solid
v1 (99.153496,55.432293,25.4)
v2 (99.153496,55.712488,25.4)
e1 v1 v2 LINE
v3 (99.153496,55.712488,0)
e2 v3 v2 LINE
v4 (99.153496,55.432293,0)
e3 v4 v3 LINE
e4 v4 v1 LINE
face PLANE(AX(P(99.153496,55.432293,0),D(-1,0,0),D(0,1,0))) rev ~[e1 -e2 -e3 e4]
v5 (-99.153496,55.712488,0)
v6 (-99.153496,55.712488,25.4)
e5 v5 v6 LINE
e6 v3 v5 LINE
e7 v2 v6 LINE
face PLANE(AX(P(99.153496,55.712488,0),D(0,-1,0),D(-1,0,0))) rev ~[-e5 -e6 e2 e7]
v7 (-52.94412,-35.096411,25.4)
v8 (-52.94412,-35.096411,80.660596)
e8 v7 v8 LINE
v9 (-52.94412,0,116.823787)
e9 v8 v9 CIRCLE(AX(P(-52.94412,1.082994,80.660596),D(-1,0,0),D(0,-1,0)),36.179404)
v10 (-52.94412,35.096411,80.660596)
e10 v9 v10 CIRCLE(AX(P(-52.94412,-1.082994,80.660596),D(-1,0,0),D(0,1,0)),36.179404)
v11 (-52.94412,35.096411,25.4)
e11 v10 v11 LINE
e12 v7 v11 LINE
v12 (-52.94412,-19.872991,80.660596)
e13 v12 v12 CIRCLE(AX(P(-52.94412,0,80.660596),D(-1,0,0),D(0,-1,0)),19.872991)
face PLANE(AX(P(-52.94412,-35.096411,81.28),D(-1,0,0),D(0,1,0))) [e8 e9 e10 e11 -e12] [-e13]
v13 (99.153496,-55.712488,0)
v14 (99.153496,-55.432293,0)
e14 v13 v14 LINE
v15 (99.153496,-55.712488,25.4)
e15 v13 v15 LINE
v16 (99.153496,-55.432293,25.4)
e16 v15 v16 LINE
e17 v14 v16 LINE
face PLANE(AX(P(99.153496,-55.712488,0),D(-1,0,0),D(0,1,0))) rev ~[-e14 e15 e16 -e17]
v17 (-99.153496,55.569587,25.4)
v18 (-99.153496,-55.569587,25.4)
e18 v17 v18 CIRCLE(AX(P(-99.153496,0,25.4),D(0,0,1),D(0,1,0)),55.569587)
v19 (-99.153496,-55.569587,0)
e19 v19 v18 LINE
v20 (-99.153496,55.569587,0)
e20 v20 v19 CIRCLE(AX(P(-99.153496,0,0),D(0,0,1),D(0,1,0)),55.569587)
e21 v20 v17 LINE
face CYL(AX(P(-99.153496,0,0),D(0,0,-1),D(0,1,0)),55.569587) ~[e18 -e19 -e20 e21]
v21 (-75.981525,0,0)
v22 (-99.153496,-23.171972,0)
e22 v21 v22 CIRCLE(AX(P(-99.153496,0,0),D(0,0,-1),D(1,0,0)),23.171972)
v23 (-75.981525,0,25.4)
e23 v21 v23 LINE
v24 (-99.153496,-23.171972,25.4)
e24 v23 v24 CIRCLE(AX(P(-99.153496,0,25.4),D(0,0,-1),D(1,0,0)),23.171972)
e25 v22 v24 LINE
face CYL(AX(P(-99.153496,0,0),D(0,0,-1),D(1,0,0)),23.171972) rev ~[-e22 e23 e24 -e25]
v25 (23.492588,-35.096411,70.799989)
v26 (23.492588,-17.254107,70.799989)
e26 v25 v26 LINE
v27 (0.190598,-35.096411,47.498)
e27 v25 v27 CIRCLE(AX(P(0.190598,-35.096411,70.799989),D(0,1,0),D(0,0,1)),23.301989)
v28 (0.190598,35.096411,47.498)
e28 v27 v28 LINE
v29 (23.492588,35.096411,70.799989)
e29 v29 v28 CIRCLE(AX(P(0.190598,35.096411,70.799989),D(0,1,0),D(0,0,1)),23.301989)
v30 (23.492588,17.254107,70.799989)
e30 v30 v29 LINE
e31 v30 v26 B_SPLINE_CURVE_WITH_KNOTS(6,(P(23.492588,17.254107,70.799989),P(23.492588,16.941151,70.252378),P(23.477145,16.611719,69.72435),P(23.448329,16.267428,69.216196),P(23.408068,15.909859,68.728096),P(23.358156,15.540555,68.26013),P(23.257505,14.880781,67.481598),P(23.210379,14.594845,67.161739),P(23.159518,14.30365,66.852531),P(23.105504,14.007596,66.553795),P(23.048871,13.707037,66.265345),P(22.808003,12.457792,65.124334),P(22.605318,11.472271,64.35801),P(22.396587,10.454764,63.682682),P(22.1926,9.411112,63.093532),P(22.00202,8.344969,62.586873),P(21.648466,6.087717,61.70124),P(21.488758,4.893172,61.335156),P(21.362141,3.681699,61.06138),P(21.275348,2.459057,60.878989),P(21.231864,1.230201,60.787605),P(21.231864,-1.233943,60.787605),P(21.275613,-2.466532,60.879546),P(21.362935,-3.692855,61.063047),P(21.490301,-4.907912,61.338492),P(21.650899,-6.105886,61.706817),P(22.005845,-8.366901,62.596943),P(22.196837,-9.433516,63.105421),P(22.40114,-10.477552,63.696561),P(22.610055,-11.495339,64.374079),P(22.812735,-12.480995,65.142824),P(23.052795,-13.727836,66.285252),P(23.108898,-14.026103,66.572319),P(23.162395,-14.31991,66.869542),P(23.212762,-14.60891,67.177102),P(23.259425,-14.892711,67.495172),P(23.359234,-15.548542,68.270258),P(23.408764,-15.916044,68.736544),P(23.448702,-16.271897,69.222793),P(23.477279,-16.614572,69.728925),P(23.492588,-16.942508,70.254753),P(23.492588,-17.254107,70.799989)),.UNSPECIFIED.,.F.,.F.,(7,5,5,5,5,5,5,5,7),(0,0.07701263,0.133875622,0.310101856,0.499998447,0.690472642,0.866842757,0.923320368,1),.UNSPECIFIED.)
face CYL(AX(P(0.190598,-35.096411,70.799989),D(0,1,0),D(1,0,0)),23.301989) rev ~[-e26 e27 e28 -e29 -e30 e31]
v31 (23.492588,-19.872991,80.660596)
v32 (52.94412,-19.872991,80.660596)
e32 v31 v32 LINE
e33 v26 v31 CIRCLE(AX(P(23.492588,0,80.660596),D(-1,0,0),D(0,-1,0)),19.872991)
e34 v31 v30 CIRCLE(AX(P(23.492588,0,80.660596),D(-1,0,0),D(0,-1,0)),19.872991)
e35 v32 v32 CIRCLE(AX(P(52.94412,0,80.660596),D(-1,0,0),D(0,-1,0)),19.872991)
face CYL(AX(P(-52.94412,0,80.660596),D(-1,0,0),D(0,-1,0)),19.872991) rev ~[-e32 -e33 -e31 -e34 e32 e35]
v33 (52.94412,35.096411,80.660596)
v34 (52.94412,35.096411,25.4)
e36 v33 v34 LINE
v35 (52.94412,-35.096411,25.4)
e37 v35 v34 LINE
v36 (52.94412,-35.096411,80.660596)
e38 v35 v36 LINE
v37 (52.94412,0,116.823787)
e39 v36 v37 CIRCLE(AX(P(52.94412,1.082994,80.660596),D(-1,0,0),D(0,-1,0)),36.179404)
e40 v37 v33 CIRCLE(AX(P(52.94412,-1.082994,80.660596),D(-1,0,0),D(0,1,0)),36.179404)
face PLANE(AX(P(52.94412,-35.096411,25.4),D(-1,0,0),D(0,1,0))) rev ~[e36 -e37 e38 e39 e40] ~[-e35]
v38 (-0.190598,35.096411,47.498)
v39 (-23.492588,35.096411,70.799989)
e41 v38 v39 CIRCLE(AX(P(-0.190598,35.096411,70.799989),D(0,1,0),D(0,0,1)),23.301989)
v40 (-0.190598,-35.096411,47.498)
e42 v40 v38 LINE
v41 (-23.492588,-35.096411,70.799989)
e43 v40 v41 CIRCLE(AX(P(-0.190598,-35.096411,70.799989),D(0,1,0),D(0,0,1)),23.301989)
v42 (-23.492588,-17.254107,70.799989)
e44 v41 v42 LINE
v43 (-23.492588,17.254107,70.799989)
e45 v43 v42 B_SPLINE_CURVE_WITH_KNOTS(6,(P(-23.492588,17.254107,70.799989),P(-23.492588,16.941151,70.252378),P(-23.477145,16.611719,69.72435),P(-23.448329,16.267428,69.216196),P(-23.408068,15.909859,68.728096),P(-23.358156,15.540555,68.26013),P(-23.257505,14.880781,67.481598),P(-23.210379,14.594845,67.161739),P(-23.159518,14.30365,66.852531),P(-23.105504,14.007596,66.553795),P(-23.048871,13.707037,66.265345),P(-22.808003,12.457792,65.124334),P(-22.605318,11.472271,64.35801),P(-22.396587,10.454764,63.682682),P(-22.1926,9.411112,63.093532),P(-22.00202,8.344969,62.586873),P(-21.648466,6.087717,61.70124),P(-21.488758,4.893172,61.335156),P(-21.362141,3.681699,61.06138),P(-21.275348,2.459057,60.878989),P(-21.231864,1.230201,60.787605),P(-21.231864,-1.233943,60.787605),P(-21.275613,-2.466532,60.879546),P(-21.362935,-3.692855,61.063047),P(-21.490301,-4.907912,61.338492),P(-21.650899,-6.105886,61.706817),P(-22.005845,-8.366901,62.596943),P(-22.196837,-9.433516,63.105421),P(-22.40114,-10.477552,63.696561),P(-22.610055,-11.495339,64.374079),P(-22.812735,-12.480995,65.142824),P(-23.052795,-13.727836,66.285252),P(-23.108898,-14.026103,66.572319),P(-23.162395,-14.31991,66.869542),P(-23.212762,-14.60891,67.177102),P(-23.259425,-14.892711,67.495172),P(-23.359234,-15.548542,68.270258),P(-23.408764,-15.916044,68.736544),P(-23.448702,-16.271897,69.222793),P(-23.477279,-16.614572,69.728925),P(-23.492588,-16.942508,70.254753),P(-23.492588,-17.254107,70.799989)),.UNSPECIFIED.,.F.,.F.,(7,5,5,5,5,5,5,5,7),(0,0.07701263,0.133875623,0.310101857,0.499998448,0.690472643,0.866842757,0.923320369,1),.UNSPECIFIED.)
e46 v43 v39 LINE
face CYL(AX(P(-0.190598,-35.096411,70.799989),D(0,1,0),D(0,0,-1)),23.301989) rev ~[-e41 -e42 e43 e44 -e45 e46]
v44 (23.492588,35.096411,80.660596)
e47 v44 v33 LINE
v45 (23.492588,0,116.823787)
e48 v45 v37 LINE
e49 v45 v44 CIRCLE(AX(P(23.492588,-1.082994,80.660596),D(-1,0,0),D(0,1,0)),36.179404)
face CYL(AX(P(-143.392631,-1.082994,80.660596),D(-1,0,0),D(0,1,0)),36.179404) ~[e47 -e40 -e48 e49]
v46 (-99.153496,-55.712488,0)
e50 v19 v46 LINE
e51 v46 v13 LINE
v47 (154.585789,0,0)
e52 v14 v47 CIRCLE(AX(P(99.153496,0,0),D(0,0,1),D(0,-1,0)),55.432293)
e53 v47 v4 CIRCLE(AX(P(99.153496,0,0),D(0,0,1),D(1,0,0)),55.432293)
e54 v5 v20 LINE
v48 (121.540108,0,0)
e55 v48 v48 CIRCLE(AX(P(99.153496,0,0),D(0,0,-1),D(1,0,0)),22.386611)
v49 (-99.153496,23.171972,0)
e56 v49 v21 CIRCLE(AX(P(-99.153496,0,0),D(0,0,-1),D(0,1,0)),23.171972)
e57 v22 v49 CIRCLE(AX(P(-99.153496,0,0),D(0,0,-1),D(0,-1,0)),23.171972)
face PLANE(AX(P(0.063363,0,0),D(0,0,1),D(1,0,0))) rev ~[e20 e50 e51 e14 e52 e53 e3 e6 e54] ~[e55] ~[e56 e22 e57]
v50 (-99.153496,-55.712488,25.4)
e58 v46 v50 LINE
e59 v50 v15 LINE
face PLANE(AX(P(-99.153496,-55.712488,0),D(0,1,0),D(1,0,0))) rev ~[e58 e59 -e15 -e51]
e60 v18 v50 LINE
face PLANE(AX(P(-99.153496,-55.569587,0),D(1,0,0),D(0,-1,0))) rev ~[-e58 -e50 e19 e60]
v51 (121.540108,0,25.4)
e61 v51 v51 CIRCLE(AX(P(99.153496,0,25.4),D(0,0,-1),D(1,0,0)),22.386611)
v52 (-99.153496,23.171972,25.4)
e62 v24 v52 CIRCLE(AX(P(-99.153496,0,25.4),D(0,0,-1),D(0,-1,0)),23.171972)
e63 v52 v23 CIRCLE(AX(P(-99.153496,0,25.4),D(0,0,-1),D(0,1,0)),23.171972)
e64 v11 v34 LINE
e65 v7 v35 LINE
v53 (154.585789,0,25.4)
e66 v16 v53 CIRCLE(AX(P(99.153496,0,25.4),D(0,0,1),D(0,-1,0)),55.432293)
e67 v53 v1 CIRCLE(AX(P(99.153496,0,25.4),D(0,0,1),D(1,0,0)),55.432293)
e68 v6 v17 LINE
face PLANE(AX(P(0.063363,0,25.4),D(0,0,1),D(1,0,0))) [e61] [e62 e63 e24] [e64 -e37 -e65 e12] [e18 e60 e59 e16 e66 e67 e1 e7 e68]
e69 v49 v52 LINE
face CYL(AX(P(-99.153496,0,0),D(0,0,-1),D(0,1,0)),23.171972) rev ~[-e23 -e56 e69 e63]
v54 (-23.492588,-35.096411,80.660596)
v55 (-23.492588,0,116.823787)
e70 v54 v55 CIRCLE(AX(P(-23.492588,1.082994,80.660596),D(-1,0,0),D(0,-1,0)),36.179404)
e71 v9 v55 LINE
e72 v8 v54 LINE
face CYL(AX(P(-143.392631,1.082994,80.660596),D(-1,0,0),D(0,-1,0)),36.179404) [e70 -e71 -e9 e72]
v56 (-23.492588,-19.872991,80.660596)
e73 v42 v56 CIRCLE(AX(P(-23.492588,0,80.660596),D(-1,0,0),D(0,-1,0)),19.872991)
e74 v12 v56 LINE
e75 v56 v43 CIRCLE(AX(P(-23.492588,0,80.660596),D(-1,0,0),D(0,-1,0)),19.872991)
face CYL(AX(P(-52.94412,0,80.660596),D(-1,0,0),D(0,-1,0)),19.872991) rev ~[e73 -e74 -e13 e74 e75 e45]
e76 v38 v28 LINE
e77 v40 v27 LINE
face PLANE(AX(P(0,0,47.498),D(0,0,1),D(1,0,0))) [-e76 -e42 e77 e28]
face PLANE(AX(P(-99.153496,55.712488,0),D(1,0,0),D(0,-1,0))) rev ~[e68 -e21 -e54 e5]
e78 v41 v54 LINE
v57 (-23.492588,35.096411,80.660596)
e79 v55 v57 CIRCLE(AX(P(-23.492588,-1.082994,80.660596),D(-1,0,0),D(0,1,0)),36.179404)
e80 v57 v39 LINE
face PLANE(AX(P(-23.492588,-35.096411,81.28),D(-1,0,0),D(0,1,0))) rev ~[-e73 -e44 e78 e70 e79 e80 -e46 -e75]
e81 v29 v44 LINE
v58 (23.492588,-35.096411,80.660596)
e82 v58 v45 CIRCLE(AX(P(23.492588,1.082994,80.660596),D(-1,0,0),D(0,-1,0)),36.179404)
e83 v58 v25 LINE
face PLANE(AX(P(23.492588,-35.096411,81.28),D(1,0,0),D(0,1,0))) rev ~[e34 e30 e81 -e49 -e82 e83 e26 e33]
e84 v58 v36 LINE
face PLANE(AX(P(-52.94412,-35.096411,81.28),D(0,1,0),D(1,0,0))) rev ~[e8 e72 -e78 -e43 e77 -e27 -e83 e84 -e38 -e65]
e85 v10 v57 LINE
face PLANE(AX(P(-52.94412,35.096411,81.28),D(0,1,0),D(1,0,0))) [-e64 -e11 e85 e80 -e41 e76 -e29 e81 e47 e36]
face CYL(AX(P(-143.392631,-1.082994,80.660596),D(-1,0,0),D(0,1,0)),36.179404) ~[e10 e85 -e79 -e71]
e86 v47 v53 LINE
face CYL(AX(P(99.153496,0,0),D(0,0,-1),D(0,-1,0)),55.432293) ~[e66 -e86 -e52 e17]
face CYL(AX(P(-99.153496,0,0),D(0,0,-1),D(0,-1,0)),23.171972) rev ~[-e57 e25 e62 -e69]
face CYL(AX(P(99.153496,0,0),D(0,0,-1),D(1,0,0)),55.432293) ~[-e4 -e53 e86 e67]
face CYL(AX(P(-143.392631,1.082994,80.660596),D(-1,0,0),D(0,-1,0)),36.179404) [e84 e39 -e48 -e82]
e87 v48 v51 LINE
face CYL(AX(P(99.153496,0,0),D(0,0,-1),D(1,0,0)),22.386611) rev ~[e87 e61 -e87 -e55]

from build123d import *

# Parameters (mm, degrees)
F1_DEPTH    = 25.4
F2_W        = 105.8882400393
F2_H        = 70.1928213239
F3_DEPTH    = 55.88
F4_W        = 46.9851754606
F4_H        = 70.1928213239
F5_DEPTH    = 33.782
F6_R        = 23.301989304
F7_DEPTH    = 35.56
F8_T1_DEPTH = 210.348554518
F8_T3_DEPTH = 210.348554518
F9_R        = 19.8729907894
F10_DEPTH   = 207.5309093164


# Not quite as in the source:
# - a fillet or chamfer that OpenCascade refuses, or shapes differently, is made with other operations: its cross-section is extruded or revolved along the edge and cut away or added


with BuildPart() as f1:
    # F0 (on Top) → F1 (new body)
    with BuildSketch(Plane.XY):
        with BuildLine():
            Line((-99.153496325, -55.7124875486), (99.153496325, -55.7124875486))
            Line((99.153496325, -55.7124875486), (99.153496325, -55.4322929717))
            ThreePointArc((99.153496325, -55.4322929717), (43.7212033534, 0), (99.153496325, 55.4322929717))
            Line((99.153496325, 55.4322929717), (99.153496325, 55.7124875486))
            Line((99.153496325, 55.7124875486), (-99.153496325, 55.7124875486))
            Line((-99.153496325, 55.7124875486), (-99.153496325, 55.5695868493))
            ThreePointArc((-99.153496325, 55.5695868493), (-59.8598646362, 39.2936316888), (-43.5839094758, 0))
            ThreePointArc((-43.5839094758, 0), (-59.8598646362, -39.2936316888), (-99.153496325, -55.5695868493))
            Line((-99.153496325, -55.5695868493), (-99.153496325, -55.7124875486))
        make_face()
        with BuildLine():
            Line((99.153496325, -22.3866111857), (99.153496325, -55.4322929717))
            ThreePointArc((99.153496325, -55.4322929717), (138.350046582, -39.196550257), (154.5857892967, 0))
            ThreePointArc((154.5857892967, 0), (138.350046582, 39.196550257), (99.153496325, 55.4322929717))
            Line((99.153496325, 55.4322929717), (99.153496325, 22.3866111857))
            ThreePointArc((99.153496325, 22.3866111857), (114.9832209022, 15.8297245772), (121.5401075107, 0))
            ThreePointArc((121.5401075107, 0), (114.9832209022, -15.8297245772), (99.153496325, -22.3866111857))
        make_face()
        with BuildLine():
            ThreePointArc((-99.153496325, 55.5695868493), (-154.7230831743, 0), (-99.153496325, -55.5695868493))
            Line((-99.153496325, -55.5695868493), (-99.153496325, -23.1719717835))
            ThreePointArc((-99.153496325, -23.1719717835), (-122.3254681085, 0), (-99.153496325, 23.1719717835))
            Line((-99.153496325, 23.1719717835), (-99.153496325, 55.5695868493))
        make_face()
        with BuildLine():
            ThreePointArc((99.153496325, 55.4322929717), (43.7212033534, 0), (99.153496325, -55.4322929717))
            Line((99.153496325, -55.4322929717), (99.153496325, -22.3866111857))
            ThreePointArc((99.153496325, -22.3866111857), (76.7668851393, 0), (99.153496325, 22.3866111857))
            Line((99.153496325, 22.3866111857), (99.153496325, 55.4322929717))
        make_face()
        with BuildLine():
            Line((-99.153496325, -23.1719717835), (-99.153496325, -55.5695868493))
            ThreePointArc((-99.153496325, -55.5695868493), (-59.8598646362, -39.2936316888), (-43.5839094758, 0))
            ThreePointArc((-43.5839094758, 0), (-59.8598646362, 39.2936316888), (-99.153496325, 55.5695868493))
            Line((-99.153496325, 55.5695868493), (-99.153496325, 23.1719717835))
            ThreePointArc((-99.153496325, 23.1719717835), (-82.7684379434, 16.3850583816), (-75.9815245415, 0))
            ThreePointArc((-75.9815245415, 0), (-82.7684379434, -16.3850583816), (-99.153496325, -23.1719717835))
        make_face()
    extrude(amount=F1_DEPTH)

    # F2 (on face) → F3 (join)
    with BuildSketch(Plane.XY.offset(25.4)):
        Rectangle(F2_W, F2_H)
    extrude(amount=F3_DEPTH)

    # F4 (on face) → F5 (cut)
    with BuildSketch(Plane.XY.offset(81.28)):
        Rectangle(F4_W, F4_H)
    extrude(amount=-F5_DEPTH, mode=Mode.SUBTRACT)

    # F6
    f6_edges = [f1.edges().sort_by_distance(p)[0] for p in [
        (-23.492588, 0, 47.498),
        (23.492588, 0, 47.498),
    ]]
    fillet(f6_edges, radius=F6_R)

    # F7 (add): faces of the model
    f7_faces = [f1.faces().sort_by_distance(p)[0] for p in [
        (-38.218353875, 0, 81.28),
        (38.218353875, 0, 81.28),
    ]]
    extrude(f7_faces, amount=F7_DEPTH)

    # F8: fillet of radius 36.1794044457 on 4 edges, made by hand

    # F8_s2 → F8_t1 (cut)
    with BuildSketch(Plane.YZ.offset(-143.392631134)):
        with BuildLine():
            ThreePointArc((-35.0964106619, 80.6605955543), (-24.4997084391, 106.2432977771), (1.0829937838, 116.84))
            Line((1.0829937838, 116.84), (-35.0964106619, 116.84))
            Line((-35.0964106619, 116.84), (-35.0964106619, 80.6605955543))
        make_face()
        with BuildLine():
            ThreePointArc((35.0964106619, 80.6605955543), (24.4997084391, 106.2432977771), (-1.0829937838, 116.84))
            Line((-1.0829937838, 116.84), (35.0964106619, 116.84))
            Line((35.0964106619, 116.84), (35.0964106619, 80.6605955543))
        make_face()
    extrude(amount=F8_T1_DEPTH, mode=Mode.SUBTRACT)

    # F8_s4 → F8_t3 (cut)
    with BuildSketch(Plane.YZ.offset(-66.955923384)):
        with BuildLine():
            ThreePointArc((-35.0964106619, 80.6605955543), (-24.4997084391, 106.2432977771), (1.0829937838, 116.84))
            Line((1.0829937838, 116.84), (-35.0964106619, 116.84))
            Line((-35.0964106619, 116.84), (-35.0964106619, 80.6605955543))
        make_face()
        with BuildLine():
            ThreePointArc((35.0964106619, 80.6605955543), (24.4997084391, 106.2432977771), (-1.0829937838, 116.84))
            Line((-1.0829937838, 116.84), (35.0964106619, 116.84))
            Line((35.0964106619, 116.84), (35.0964106619, 80.6605955543))
        make_face()
    extrude(amount=F8_T3_DEPTH, mode=Mode.SUBTRACT)

    # F9 (on face) → F10 (cut, through all)
    with BuildSketch(Plane(origin=(-52.9441200197, 0, 0), x_dir=(0, -1, 0), z_dir=(-1, 0, 0))):
        with Locations((0, 80.6605955543)):
            Circle(F9_R)
    extrude(amount=-F10_DEPTH, mode=Mode.SUBTRACT)


solid = f1.part
